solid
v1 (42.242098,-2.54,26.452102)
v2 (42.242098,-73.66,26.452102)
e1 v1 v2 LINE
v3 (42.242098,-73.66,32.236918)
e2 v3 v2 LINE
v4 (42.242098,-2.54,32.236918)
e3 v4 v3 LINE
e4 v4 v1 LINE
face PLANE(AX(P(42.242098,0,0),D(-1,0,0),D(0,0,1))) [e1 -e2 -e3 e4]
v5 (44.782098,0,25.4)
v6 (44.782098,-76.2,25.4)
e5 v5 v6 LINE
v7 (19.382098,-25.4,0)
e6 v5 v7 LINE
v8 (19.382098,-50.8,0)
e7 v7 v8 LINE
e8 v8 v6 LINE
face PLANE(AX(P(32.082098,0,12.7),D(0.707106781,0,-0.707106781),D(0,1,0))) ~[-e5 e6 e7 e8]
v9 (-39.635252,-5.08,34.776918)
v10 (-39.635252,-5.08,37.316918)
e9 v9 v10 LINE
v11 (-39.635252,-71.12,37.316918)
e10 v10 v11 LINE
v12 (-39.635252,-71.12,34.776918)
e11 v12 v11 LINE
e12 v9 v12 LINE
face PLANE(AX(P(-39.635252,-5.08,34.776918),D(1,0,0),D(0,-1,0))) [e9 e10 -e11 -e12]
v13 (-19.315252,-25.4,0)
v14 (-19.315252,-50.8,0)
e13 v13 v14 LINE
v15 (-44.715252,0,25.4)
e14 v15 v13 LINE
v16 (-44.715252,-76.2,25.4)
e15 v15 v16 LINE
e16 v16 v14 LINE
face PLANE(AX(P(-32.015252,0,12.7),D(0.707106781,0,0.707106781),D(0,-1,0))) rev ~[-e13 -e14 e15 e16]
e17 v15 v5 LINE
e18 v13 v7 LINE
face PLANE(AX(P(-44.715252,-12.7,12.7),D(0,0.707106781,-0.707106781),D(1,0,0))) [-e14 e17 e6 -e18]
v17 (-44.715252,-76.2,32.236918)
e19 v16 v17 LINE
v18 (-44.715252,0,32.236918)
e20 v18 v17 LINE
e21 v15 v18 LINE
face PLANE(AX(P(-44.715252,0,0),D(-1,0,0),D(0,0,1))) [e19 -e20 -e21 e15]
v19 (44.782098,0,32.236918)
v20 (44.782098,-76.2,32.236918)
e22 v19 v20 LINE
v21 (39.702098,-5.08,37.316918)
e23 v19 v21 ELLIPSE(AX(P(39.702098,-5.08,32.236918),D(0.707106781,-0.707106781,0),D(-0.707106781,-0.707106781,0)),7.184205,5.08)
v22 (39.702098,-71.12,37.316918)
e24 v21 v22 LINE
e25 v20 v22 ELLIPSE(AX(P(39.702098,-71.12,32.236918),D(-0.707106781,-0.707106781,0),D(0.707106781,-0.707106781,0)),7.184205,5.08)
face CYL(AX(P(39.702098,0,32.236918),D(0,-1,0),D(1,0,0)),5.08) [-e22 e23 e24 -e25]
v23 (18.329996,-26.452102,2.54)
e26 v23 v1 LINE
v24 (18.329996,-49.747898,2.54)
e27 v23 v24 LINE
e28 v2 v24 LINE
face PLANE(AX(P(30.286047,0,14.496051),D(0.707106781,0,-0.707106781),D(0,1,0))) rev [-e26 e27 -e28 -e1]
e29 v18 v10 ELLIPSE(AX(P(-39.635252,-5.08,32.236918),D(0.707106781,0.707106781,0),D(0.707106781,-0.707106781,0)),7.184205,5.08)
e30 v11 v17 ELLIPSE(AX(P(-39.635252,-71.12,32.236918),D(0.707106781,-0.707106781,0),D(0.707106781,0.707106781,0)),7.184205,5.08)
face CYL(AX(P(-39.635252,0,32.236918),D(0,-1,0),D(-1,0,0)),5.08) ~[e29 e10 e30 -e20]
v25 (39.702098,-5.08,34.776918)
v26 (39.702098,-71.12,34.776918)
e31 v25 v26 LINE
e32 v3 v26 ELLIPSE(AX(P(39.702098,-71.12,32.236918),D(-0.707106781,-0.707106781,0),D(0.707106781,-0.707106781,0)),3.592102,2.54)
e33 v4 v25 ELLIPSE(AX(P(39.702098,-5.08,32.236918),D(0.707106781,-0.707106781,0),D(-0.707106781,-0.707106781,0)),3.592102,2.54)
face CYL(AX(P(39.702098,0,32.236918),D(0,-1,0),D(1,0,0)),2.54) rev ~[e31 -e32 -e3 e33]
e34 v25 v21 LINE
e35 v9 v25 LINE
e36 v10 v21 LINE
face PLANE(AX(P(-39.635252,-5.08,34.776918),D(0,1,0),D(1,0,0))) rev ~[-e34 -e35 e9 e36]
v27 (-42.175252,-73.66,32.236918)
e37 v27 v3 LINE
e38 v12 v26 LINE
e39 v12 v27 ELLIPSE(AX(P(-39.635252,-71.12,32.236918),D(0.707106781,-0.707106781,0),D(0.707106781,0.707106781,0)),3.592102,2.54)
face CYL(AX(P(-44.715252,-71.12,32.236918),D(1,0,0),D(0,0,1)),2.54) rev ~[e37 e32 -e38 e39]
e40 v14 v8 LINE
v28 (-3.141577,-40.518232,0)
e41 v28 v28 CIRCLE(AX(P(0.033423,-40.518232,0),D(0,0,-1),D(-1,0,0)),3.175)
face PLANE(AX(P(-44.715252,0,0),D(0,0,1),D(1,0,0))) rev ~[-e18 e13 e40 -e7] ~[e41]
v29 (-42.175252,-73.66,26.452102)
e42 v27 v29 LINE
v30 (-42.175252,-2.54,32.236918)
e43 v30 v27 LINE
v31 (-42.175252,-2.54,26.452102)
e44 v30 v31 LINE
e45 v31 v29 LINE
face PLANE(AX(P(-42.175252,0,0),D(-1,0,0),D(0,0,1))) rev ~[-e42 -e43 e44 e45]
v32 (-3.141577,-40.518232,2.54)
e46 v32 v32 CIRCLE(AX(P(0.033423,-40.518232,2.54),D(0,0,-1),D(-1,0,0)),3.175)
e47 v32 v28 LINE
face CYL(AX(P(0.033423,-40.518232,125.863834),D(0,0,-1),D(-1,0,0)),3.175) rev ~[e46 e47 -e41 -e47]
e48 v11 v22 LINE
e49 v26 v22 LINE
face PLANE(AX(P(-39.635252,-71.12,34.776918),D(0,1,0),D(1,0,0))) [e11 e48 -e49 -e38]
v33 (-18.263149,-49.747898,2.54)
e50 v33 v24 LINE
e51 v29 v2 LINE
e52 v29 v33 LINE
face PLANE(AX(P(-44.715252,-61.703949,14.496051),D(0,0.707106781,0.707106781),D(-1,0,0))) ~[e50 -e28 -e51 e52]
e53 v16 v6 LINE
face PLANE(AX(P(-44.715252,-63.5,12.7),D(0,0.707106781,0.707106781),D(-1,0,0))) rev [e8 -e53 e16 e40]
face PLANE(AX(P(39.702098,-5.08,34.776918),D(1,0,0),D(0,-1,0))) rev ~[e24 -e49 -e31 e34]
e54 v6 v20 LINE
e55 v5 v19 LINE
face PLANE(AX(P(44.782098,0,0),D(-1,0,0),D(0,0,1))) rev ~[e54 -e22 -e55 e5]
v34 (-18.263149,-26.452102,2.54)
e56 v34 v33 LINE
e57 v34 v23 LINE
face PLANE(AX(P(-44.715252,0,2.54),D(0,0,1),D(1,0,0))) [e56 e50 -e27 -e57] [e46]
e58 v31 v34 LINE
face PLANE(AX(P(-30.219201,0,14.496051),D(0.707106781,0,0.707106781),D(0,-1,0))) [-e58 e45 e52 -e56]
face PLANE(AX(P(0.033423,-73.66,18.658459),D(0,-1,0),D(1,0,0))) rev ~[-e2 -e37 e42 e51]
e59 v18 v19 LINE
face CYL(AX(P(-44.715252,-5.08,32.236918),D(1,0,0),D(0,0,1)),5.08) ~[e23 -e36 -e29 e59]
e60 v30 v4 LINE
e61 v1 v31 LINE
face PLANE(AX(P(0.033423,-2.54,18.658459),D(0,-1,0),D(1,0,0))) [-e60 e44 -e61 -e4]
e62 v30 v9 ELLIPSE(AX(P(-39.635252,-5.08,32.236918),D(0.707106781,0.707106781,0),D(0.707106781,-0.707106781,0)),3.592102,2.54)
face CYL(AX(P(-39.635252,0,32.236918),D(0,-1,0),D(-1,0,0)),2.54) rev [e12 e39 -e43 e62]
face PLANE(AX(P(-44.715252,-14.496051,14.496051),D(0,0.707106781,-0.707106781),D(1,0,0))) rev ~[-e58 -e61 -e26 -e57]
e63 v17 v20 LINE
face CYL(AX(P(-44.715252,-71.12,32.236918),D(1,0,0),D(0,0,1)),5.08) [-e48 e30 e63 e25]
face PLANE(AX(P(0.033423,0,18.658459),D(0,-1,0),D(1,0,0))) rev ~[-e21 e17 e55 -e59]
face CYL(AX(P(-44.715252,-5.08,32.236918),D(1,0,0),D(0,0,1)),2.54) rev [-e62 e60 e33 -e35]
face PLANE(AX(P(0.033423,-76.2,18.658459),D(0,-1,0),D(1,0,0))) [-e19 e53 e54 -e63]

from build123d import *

# Parameters (mm, degrees)
F0_W     = 89.4973501563
F0_H     = 37.3169183731
F1_DEPTH = 76.2
F2_R     = 5.08
F3_SIZE  = 25.4
F4_T     = -2.54
F6_D     = 6.35


# Not quite as in the source:
# - a shell that OpenCascade refuses in one call is made with other operations: the cavity is built on its own and cut out


with BuildPart() as f1:
    # F0 (on Front) → F1 (new body)
    with BuildSketch(Plane.XZ):
        with Locations((0.0334233046, 18.6584591866)):
            Rectangle(F0_W, F0_H)
    extrude(amount=F1_DEPTH)

    # F2
    f2_edges = [f1.edges().sort_by_distance(p)[0] for p in [
        (44.782098, -38.1, 37.316918),
        (0.033423, -76.2, 37.316918),
        (-44.715252, -38.1, 37.316918),
        (0.033423, 0, 37.316918),
    ]]
    fillet(f2_edges, radius=F2_R)

    # F3
    f3_edges = [f1.edges().sort_by_distance(p)[0] for p in [
        (-44.715252, -38.1, 0),
        (0.033423, 0, 0),
        (44.782098, -38.1, 0),
        (0.033423, -76.2, 0),
    ]]
    chamfer(f3_edges, length=F3_SIZE)

    # F4: a shell. OpenCascade refuses it in one call, so the cavity is built on its own and cut out:
    # the body offset inwards by the wall thickness, plus a prism from it out through each open face.
    f4_core = offset(f1.part, amount=F4_T, mode=Mode.PRIVATE)
    f4_exits = [f4_core.faces().sort_by_distance(p)[0] for p in [
        (0.033423, -38.1, 34.776918),
    ]]
    add(f4_core, mode=Mode.SUBTRACT)
    extrude(f4_exits, amount=-F4_T, mode=Mode.SUBTRACT)

    # F6 (through all)
    with Locations(Plane.XY.offset(2.54)):
        with Locations((0.0334233046, -40.5182316899)):
            Hole(F6_D / 2)


solid = f1.part
